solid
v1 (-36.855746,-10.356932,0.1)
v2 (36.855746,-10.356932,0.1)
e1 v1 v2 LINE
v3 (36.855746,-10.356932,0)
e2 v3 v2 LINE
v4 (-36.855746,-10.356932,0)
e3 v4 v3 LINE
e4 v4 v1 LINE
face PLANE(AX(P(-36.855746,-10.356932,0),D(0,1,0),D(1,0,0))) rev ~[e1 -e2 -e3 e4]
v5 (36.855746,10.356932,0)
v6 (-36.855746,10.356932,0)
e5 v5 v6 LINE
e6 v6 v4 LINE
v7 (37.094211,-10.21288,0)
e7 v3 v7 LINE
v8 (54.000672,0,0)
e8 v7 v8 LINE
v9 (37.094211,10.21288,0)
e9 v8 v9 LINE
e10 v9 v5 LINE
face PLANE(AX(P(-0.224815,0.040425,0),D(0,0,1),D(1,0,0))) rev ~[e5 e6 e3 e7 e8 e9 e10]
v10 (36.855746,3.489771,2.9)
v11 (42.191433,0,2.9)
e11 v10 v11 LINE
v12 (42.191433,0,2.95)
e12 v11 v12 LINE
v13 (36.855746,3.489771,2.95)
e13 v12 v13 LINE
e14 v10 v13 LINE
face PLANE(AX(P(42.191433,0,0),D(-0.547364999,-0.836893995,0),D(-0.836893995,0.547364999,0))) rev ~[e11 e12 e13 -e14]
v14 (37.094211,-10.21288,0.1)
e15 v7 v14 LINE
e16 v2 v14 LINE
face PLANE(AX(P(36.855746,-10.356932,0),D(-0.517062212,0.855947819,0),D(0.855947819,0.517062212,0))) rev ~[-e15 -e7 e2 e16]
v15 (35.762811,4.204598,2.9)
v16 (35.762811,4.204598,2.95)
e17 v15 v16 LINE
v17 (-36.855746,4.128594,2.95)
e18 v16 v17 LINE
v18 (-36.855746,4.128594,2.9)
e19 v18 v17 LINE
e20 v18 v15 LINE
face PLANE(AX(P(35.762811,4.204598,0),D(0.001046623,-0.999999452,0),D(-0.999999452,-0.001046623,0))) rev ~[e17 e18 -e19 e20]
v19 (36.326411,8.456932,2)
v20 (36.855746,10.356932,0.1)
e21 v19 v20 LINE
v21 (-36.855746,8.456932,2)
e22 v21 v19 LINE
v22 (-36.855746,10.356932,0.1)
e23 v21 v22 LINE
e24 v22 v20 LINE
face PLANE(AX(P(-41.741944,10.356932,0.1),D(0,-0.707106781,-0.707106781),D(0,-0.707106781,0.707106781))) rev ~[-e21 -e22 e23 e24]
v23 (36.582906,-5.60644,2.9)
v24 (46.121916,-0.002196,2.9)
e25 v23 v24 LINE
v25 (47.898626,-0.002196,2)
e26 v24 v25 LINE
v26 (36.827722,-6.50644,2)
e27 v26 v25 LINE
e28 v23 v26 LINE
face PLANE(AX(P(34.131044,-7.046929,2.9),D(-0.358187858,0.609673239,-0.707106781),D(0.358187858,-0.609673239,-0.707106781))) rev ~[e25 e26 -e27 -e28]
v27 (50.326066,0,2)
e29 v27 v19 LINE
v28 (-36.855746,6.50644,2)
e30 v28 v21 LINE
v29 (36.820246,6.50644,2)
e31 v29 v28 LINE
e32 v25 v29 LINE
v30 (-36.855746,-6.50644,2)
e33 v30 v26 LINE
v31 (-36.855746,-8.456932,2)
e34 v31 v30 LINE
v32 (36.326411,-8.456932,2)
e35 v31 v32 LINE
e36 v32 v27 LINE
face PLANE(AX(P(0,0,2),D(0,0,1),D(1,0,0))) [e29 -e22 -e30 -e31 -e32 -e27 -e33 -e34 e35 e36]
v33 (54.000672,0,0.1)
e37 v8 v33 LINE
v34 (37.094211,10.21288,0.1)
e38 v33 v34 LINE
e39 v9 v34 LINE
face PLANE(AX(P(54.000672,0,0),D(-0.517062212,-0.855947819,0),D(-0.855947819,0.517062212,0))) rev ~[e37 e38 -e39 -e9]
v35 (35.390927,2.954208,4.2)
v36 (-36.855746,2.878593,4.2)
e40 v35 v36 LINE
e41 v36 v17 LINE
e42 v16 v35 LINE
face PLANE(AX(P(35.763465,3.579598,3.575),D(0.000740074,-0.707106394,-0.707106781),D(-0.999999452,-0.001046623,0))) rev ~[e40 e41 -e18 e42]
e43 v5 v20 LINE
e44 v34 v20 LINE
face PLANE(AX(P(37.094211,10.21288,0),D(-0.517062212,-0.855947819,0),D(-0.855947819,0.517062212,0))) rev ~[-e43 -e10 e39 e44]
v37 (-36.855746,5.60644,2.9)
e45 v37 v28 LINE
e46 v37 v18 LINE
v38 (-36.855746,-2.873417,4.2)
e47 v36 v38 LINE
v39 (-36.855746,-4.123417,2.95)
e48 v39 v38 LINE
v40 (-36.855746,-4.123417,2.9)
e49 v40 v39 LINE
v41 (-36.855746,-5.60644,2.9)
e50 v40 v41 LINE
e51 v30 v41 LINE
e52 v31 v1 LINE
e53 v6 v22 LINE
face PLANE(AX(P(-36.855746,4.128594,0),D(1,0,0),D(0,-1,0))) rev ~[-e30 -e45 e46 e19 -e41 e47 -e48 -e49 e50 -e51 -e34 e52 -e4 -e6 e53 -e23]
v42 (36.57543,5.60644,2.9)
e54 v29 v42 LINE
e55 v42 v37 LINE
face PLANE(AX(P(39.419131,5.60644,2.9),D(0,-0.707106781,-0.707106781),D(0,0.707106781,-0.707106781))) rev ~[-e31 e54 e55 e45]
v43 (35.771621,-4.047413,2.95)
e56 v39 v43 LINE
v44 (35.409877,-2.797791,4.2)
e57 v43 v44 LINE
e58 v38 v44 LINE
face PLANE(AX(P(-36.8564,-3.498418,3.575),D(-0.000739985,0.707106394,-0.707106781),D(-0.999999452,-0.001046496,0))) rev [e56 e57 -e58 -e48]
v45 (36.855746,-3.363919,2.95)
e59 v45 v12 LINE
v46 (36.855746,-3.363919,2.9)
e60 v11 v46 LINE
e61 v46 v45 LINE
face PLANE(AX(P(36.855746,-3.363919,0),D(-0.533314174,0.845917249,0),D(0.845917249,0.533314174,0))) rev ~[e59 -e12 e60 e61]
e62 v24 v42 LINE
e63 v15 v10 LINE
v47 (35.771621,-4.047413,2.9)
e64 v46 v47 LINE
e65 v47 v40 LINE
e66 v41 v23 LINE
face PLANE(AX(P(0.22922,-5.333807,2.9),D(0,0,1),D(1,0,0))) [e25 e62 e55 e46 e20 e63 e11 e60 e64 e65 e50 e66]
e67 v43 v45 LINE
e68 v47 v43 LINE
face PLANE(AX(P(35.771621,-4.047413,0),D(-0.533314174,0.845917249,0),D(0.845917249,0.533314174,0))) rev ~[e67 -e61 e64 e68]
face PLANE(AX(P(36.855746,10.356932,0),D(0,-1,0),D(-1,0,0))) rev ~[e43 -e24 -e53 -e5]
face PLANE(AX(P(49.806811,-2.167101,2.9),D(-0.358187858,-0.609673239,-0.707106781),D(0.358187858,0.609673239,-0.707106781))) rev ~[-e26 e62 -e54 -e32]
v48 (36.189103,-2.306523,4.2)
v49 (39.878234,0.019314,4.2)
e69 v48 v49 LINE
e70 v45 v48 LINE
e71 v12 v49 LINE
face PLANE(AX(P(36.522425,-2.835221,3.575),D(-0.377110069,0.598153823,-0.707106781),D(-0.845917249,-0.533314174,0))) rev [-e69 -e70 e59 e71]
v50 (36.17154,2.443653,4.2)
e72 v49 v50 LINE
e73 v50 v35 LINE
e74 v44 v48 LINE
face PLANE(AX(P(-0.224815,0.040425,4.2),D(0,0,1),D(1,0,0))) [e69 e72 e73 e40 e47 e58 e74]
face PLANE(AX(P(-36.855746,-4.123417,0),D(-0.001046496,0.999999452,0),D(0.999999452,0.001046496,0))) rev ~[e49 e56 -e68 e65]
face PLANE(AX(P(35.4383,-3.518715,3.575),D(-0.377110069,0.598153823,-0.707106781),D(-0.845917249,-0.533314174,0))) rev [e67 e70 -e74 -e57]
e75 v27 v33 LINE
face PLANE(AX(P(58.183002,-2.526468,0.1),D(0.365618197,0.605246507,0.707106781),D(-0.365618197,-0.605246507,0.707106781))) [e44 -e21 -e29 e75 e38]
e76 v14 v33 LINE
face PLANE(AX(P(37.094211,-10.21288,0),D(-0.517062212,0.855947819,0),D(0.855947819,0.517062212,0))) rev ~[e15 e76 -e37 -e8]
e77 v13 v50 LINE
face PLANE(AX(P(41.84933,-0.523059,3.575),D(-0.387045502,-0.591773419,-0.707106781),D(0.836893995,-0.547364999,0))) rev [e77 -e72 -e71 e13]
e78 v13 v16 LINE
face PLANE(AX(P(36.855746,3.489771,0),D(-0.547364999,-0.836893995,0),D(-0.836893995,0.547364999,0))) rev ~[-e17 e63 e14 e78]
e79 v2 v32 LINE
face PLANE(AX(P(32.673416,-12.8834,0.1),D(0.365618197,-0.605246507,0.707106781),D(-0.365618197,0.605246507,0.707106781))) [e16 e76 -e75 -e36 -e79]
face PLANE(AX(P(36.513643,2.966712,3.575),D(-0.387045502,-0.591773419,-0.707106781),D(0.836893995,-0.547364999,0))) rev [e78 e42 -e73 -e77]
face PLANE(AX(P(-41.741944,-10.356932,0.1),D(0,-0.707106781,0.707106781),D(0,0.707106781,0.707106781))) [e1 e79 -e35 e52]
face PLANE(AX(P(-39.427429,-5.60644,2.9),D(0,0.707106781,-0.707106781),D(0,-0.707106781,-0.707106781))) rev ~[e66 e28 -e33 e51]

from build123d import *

# Parameters (mm, degrees)
F1_DEPTH     = 2
F2_DEPTH     = 2.9
F3_DEPTH     = 4.2
F4_SIZE      = 1.25
F5_T4_DEPTH  = 18.1896245494
F5_T9_DEPTH  = 18.1809539711
F5_T14_DEPTH = 78.8540359797
F5_T19_DEPTH = 78.8465601363
F6_T1_DEPTH  = 29.8027354216
F6_T3_DEPTH  = 83.4838874755
F6_T5_DEPTH  = 29.8027354216


# Not quite as in the source:
# - a fillet or chamfer that OpenCascade refuses, or shapes differently, is made with other operations: its cross-section is extruded or revolved along the edge and cut away or added


with BuildPart() as f1:
    # F0 (on Top) → F1 (new body)
    with BuildSketch(Plane.XY):
        Polygon((-36.8557460606, 10.3569319472), (-36.8557460606, 6.6064400598), (36.8474480997, 6.6064400598), (36.8557460606, 6.6015649421), (36.8557460606, 10.3569319472), (36.5771486739, 10.3569319472), align=None)
        Polygon((-36.8557460606, -10.3569319472), (36.5771486739, -10.3569319472), (36.8557460606, -10.3569319472), (36.8557460606, -6.6059570593), (36.8549239432, -6.6064400598), (-36.8557460606, -6.6064400598), align=None)
        Polygon((48.0923008195, 0), (54.000671953, 0), (37.0942108861, 10.2128797661), (36.8557460606, 10.3569319472), (36.8557460606, 6.6015649421), align=None)
        Polygon((36.8557460606, -6.6059570593), (36.8557460606, -10.3569319472), (37.0942108861, -10.2128797661), (54.000671953, 0), (48.0923008195, 0), (48.0960387413, -0.0021960586), align=None)
    extrude(amount=F1_DEPTH)

    # F0 (on Top) → F2 (join)
    with BuildSketch(Plane.XY):
        Polygon((-36.8557460606, -4.1234174278), (-36.8557460606, -6.6064400598), (36.8549239432, -6.6064400598), (36.8557460606, -6.6059570593), (36.8557460606, -3.3639193541), (35.7716211712, -4.0474131238), align=None)
        Polygon((36.8557460606, -3.3639193541), (36.8557460606, -6.6059570593), (48.0960387413, -0.0021960586), (48.0923008195, 0), (42.1914328796, 0), align=None)
        Polygon((-36.8557460606, 6.6064400598), (-36.8557460606, 4.1285937186), (35.7628105821, 4.2045980226), (36.8557460606, 3.4897707798), (36.8557460606, 6.6015649421), (36.8474480997, 6.6064400598), align=None)
        Polygon((36.8557460606, 3.4897707798), (42.1914328796, 0), (48.0923008195, 0), (36.8557460606, 6.6015649421), align=None)
    extrude(amount=F2_DEPTH)

    # F0 (on Top) → F3 (join)
    with BuildSketch(Plane.XY):
        Polygon((-36.8557460606, 4.1285937186), (-36.8557460606, -4.1234174278), (35.7716211712, -4.0474131238), (36.8557460606, -3.3639193541), (36.8557460606, 0), (36.8557460606, 3.4897707798), (35.7628105821, 4.2045980226), align=None)
        Polygon((36.8557460606, 0), (36.8557460606, -3.3639193541), (42.1914328796, 0), align=None)
        Polygon((36.8557460606, 3.4897707798), (36.8557460606, 0), (42.1914328796, 0), align=None)
    extrude(amount=F3_DEPTH)

    # F4
    f4_edges = [f1.edges().sort_by_distance(p)[0] for p in [
        (38.981527, -2.023707, 4.2),
        (-0.542062, -4.085415, 4.2),
        (38.977122, 2.102299, 4.2),
        (-0.546468, 4.166596, 4.2),
    ]]
    chamfer(f4_edges, length=F4_SIZE)

    # F5: chamfer of 1 on 4 edges, made by hand


with BuildPart() as f5_tool2:
    # F5_s3 → F5_t4 (new body)
    with BuildSketch(Plane(origin=(37.9730206881, -22.3094504942, 0), x_dir=(0, 0, 1), z_dir=(-0.8622081632, 0.5065541267, 0))):
        Polygon((2.9, 23.3613534429), (1.9, 24.3613534429), (2.9, 24.3613534429), align=None)
    extrude(amount=F5_T4_DEPTH)

    split(bisect_by=Plane.XY.offset(2), keep=Keep.TOP)


with BuildPart() as f1_1:
    add(f1.part)

    # F5_t1: cut F5_tool2
    add(f5_tool2.part, mode=Mode.SUBTRACT)


with BuildPart() as f5_tool7:
    # F5_s8 → F5_t9 (new body)
    with BuildSketch(Plane(origin=(22.2953354795, 13.0986862283, 0), x_dir=(0, 0, 1), z_dir=(0.8622081632, 0.5065541267, 0))):
        Polygon((2.9, 23.3651403622), (1.9, 24.3651403622), (2.9, 24.3651403622), align=None)
    extrude(amount=F5_T9_DEPTH)

    split(bisect_by=Plane.XY.offset(2), keep=Keep.TOP)


with BuildPart() as f1_2:
    add(f1_1.part)

    # F5_t6: cut F5_tool7
    add(f5_tool7.part, mode=Mode.SUBTRACT)


with BuildPart() as f5_tool12:
    # F5_s13 → F5_t14 (new body)
    with BuildSketch(Plane.YZ.offset(-39.4274290486)):
        Polygon((-5.6064400598, 2.9), (-6.6064400598, 1.9), (-6.6064400598, 2.9), align=None)
    extrude(amount=F5_T14_DEPTH)

    split(bisect_by=Plane.XY.offset(2), keep=Keep.TOP)


with BuildPart() as f1_3:
    add(f1_2.part)

    # F5_t11: cut F5_tool12
    add(f5_tool12.part, mode=Mode.SUBTRACT)


with BuildPart() as f5_tool17:
    # F5_s18 → F5_t19 (new body)
    with BuildSketch(Plane.YZ.offset(39.4191310877)):
        Polygon((5.6064400598, 2.9), (6.6064400598, 1.9), (6.6064400598, 2.9), align=None)
    extrude(amount=-F5_T19_DEPTH)

    split(bisect_by=Plane.XY.offset(2), keep=Keep.TOP)


with BuildPart() as f1_4:
    add(f1_3.part)

    # F5_t16: cut F5_tool17
    add(f5_tool17.part, mode=Mode.SUBTRACT)

    # F6: chamfer of 1.9 on 4 edges, made by hand

    # F6_s2 → F6_t1 (cut)
    with BuildSketch(Plane(origin=(43.7457426568, -26.4259923035, 0), x_dir=(0, 0, 1), z_dir=(-0.8559478189, 0.5170622122, 0))):
        Polygon((0.1, 27.9217069026), (2, 26.0217069026), (2, 27.9217069026), align=None)
    extrude(amount=F6_T1_DEPTH, mode=Mode.SUBTRACT)

    # F6_s4 → F6_t3 (cut)
    with BuildSketch(Plane.YZ.offset(-41.7419437377)):
        Polygon((10.3569319472, 0.1), (8.4569319472, 2), (10.3569319472, 2), align=None)
        Polygon((-10.3569319472, 0.1), (-8.4569319472, 2), (-10.3569319472, 2), align=None)
    extrude(amount=F6_T3_DEPTH, mode=Mode.SUBTRACT)

    # F6_s6 → F6_t5 (cut)
    with BuildSketch(Plane(origin=(18.2361562756, 11.0161239955, 0), x_dir=(0, 0, 1), z_dir=(0.8559478189, 0.5170622122, 0))):
        Polygon((0.1, 27.9217069026), (2, 26.0217069026), (2, 27.9217069026), align=None)
    extrude(amount=F6_T5_DEPTH, mode=Mode.SUBTRACT)


solid = f1_4.part
